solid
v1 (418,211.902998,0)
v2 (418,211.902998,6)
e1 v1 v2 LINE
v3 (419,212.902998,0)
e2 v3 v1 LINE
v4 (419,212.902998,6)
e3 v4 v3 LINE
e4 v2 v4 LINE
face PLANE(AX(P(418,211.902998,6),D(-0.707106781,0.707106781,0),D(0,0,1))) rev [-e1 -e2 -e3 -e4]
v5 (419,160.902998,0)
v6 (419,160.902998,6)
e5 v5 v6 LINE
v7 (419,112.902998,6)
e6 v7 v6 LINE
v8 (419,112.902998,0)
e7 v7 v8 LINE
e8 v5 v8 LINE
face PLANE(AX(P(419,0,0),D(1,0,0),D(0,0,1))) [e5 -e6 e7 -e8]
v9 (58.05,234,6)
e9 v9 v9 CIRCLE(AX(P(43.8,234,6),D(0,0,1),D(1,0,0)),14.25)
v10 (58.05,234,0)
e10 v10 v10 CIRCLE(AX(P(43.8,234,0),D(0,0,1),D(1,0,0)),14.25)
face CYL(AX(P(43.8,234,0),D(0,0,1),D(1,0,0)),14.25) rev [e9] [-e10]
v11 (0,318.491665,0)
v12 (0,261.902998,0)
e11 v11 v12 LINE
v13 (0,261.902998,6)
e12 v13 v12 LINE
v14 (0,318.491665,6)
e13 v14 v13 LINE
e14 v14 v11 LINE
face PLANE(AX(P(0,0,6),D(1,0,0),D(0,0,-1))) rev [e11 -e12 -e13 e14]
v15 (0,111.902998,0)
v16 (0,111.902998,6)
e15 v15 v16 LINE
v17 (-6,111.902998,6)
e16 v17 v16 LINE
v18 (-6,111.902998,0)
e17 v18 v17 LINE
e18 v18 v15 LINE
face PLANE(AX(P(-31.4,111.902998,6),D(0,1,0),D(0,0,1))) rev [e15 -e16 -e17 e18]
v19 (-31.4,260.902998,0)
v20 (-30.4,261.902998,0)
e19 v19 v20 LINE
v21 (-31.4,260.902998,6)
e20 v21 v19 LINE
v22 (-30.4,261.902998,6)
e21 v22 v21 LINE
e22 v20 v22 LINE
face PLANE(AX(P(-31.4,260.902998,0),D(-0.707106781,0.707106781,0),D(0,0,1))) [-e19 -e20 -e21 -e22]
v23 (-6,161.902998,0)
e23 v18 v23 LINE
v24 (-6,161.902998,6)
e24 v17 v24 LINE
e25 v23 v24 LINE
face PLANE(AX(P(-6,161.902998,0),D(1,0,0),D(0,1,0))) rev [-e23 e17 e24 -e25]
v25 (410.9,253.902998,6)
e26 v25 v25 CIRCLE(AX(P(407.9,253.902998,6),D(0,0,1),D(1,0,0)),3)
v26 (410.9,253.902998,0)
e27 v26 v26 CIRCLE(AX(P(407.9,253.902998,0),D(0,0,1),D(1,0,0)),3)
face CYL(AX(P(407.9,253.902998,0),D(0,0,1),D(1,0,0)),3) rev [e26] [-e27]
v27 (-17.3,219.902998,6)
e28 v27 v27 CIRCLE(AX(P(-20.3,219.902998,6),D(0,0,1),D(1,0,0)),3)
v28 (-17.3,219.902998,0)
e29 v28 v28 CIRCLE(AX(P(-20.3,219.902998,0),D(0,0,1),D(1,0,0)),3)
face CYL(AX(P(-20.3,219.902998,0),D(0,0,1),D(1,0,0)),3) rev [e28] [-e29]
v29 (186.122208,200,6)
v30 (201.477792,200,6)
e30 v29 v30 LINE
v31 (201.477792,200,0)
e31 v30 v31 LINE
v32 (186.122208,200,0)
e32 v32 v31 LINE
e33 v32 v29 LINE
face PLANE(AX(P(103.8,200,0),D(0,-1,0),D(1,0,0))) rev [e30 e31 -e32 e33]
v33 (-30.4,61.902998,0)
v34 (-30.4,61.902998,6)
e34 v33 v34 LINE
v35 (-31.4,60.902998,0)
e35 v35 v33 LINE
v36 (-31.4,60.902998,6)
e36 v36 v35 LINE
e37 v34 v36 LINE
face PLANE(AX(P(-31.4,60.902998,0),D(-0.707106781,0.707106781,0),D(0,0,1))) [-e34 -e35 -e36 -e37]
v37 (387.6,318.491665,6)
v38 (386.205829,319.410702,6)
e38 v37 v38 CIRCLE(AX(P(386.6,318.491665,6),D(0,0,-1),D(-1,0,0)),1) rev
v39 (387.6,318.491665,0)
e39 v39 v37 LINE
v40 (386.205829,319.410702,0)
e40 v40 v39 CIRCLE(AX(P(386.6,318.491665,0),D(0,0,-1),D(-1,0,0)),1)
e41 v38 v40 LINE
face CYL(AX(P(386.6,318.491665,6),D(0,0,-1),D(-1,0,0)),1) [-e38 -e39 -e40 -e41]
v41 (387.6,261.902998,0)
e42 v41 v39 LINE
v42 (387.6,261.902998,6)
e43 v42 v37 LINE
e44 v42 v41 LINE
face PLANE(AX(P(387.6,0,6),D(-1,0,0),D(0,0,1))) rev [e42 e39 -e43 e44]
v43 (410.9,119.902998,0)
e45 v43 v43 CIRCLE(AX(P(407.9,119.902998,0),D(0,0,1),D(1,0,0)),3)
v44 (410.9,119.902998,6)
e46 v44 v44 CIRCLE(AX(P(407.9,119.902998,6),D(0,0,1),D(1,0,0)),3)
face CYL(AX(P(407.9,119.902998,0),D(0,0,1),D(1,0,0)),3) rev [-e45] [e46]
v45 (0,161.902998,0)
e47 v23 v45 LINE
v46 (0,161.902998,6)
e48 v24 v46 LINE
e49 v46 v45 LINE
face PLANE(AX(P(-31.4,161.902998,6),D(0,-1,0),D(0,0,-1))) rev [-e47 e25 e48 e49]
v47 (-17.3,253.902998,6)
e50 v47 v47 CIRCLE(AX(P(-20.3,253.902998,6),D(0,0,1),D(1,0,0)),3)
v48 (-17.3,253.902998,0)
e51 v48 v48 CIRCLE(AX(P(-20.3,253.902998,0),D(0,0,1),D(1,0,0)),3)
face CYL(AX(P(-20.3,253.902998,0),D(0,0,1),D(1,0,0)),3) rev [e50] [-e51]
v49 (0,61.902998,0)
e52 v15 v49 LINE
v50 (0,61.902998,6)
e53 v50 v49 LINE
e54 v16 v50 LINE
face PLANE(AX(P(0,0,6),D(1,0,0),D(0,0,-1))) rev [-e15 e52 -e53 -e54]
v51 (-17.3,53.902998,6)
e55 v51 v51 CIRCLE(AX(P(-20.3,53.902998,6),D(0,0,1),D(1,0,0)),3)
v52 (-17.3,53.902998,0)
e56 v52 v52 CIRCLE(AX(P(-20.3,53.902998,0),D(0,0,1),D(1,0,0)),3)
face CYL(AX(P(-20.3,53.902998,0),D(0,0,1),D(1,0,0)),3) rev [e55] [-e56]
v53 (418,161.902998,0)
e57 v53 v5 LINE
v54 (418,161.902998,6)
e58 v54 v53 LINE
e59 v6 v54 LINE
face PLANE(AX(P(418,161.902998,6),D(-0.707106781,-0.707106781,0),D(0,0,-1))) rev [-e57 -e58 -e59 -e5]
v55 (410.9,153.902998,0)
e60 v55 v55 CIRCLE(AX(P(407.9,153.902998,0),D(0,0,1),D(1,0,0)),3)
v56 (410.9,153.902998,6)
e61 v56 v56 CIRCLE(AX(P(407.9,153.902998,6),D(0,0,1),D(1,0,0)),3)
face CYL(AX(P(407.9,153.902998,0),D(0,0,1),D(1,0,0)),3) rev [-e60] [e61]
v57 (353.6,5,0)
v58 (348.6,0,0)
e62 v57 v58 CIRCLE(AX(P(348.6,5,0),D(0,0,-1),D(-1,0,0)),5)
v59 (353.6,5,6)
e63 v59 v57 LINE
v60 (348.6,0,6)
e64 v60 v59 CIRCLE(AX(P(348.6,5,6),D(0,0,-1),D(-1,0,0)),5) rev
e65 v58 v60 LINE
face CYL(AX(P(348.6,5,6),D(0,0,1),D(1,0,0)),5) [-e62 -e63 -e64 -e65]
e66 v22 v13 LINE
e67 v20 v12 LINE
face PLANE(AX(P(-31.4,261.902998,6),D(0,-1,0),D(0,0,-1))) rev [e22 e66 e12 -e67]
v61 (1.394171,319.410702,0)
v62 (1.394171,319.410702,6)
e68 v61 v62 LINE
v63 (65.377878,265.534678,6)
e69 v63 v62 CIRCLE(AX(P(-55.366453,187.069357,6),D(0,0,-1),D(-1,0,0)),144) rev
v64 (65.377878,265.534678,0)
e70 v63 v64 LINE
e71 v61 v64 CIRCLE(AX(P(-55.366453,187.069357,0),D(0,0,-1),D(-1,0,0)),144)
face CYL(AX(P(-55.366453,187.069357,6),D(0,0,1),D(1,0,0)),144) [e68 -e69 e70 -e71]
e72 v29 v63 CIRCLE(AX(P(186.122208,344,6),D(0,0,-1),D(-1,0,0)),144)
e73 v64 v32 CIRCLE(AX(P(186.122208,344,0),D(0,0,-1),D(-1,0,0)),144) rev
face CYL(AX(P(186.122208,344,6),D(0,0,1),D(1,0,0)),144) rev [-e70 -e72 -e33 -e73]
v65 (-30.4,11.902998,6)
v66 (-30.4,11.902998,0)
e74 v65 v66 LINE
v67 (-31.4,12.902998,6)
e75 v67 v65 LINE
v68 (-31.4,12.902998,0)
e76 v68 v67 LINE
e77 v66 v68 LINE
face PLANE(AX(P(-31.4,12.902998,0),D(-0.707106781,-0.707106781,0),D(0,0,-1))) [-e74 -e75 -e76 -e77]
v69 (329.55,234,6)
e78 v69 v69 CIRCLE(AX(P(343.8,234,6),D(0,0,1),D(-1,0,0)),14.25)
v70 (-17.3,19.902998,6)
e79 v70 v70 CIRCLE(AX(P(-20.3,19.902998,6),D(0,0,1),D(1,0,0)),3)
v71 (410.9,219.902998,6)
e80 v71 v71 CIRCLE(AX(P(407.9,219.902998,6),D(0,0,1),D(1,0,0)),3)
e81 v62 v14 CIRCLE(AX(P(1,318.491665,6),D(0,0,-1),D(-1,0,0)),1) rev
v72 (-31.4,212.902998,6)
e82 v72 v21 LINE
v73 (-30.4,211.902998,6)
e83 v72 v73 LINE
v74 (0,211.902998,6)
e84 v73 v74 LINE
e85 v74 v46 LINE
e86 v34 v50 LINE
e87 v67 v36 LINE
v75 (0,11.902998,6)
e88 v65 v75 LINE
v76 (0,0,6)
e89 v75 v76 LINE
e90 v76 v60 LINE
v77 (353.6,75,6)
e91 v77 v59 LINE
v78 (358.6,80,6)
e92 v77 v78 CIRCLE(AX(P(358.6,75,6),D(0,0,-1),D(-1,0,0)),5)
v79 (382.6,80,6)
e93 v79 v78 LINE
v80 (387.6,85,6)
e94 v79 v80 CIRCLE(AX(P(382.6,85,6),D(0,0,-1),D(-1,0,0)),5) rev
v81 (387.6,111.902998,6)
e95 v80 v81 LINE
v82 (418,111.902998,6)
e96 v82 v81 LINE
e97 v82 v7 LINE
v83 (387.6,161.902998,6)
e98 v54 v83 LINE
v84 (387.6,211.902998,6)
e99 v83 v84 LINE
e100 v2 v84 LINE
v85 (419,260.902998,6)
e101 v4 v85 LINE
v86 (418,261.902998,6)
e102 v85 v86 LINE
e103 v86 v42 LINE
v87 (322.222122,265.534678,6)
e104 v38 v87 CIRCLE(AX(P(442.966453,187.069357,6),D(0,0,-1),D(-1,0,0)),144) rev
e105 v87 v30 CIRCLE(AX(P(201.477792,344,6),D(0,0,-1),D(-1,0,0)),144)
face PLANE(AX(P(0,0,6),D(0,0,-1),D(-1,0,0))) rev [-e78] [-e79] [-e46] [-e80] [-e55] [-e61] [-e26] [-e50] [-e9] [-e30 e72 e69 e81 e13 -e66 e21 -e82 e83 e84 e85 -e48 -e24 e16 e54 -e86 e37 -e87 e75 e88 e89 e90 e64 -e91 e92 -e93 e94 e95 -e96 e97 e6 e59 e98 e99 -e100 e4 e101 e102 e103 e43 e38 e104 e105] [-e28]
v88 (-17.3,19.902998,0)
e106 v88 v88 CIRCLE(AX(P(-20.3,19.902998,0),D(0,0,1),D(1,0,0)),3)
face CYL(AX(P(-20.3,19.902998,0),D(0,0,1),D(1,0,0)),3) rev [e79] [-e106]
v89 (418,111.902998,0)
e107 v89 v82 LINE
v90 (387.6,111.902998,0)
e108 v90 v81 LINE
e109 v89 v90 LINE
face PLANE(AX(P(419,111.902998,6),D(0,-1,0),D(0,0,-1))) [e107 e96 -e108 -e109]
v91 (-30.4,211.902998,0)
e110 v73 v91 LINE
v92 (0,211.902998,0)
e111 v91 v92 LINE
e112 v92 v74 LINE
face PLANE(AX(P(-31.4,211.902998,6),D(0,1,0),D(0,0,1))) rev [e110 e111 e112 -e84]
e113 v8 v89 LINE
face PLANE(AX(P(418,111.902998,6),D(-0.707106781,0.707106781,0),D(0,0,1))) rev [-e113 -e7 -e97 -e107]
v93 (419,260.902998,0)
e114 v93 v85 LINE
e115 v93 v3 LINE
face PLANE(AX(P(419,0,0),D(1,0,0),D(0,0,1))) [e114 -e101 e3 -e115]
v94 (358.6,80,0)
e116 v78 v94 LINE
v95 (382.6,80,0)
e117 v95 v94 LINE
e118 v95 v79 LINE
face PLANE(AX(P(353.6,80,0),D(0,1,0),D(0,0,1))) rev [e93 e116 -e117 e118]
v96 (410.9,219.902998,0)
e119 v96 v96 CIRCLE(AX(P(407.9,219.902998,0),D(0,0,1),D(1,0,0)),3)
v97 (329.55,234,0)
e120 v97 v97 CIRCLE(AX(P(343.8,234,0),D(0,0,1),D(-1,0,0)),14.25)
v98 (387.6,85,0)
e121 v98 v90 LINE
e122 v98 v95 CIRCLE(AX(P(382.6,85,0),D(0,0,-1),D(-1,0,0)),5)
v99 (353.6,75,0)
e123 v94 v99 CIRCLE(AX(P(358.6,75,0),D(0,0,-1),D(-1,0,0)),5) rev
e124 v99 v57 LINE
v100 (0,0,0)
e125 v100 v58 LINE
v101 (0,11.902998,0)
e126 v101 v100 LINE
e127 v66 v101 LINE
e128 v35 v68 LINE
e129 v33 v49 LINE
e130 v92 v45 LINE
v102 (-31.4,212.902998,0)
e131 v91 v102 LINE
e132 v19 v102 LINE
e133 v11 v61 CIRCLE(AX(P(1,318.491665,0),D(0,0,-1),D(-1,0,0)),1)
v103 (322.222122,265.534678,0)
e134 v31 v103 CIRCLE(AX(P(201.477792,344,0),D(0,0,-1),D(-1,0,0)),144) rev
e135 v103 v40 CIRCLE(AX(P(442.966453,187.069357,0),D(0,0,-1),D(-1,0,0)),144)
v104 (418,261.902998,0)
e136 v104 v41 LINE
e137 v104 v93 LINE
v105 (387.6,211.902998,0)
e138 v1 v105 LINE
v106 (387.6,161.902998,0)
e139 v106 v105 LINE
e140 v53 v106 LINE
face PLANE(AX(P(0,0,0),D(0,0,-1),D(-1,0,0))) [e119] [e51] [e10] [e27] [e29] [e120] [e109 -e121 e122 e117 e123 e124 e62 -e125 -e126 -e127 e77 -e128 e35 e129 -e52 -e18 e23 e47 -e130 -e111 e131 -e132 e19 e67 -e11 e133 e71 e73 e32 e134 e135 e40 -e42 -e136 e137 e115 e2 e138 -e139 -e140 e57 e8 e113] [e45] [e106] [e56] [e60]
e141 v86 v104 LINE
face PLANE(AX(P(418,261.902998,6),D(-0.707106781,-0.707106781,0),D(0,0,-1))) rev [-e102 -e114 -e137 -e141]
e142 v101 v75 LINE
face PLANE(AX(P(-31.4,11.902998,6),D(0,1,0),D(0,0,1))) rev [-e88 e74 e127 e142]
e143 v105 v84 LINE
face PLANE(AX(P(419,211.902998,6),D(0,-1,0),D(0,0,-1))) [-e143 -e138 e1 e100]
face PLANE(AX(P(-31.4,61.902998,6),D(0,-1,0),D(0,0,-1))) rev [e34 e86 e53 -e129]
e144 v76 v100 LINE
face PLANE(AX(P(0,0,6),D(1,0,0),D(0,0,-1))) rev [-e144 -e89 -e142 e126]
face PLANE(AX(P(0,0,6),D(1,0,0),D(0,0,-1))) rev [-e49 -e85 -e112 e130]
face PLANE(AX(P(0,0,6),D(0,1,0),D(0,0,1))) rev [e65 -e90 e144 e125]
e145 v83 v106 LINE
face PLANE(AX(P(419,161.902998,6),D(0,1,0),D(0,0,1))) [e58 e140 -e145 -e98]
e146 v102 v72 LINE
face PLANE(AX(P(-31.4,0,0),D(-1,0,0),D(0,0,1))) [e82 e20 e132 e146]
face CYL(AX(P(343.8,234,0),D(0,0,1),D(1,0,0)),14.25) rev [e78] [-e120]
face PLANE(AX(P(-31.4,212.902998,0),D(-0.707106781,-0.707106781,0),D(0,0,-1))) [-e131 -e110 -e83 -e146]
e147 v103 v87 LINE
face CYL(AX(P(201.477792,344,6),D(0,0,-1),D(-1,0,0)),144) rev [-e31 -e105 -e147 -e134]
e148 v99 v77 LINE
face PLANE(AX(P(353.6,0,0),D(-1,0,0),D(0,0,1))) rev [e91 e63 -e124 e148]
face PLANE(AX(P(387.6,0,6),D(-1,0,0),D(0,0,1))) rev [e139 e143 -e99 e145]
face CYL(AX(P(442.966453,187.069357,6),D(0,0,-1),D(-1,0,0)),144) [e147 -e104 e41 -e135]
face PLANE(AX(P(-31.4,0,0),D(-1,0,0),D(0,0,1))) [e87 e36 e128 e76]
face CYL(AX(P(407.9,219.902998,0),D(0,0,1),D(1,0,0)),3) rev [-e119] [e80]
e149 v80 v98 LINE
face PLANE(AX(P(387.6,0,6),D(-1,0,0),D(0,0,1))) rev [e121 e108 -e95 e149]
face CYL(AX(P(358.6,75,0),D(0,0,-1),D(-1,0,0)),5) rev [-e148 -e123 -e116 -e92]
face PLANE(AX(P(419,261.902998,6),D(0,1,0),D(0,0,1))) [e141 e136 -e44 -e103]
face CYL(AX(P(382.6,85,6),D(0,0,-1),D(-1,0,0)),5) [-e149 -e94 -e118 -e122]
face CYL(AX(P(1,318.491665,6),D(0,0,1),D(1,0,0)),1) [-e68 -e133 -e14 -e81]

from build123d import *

# Parameters (mm, degrees)
ESBO_O1_W                = 387.6
ESBO_O1_H                = 320
RESSALTO_EXTRUS_O1_DEPTH = 6
CORTE_EXTRUS_O1_DEPTH    = 503.662670187
ESBO_O3_R                = 14.25
CORTE_EXTRUS_O2_DEPTH    = 503.662670187
FILETE1_R                = 144
FILETE2_R                = 144
ESBO_O4_W                = 6
ESBO_O4_H                = 50
RESSALTO_EXTRUS_O2_DEPTH = 31.4
ESBO_O5_W                = 25.4
ESBO_O5_H                = 50
CORTE_EXTRUS_O3_DEPTH    = 528.25420828
ESBO_O6_W                = 40
ESBO_O6_H                = 80
CORTE_EXTRUS_O4_DEPTH    = 528.25420828
FILETE3_R                = 5
CHANFRO1_SIZE            = 1
FILETE4_R                = 1
ESBO_O8_R                = 3
CORTE_EXTRUS_O5_DEPTH    = 527.945845339


with BuildPart() as part:
    # Esboço1 → Ressalto-extrusão1 (new body)
    with BuildSketch(Plane.XY):
        with Locations((193.8, 160)):
            Rectangle(ESBO_O1_W, ESBO_O1_H)
    extrude(amount=RESSALTO_EXTRUS_O1_DEPTH)

    # Esboço2 → Corte-extrusão1 (cut, through all)
    with BuildSketch(Plane.XY.offset(6)):
        Polygon((33.8, 320), (103.8, 200), (283.8, 200), (353.8, 320), align=None)
    extrude(amount=-CORTE_EXTRUS_O1_DEPTH, mode=Mode.SUBTRACT)

    # Esboço3 → Corte-extrusão2 (cut, through all)
    with BuildSketch(Plane.XY.offset(6)):
        with Locations((43.8, 234)):
            Circle(ESBO_O3_R)
        with Locations(Location((343.8, 234, 0), (0, 0, 180))):
            Circle(ESBO_O3_R)
    extrude(amount=-CORTE_EXTRUS_O2_DEPTH, mode=Mode.SUBTRACT)

    # Filete1
    # the kernel refuses this fillet: 144 mm, written as the material it takes off along each edge
    with BuildSketch(Plane(origin=(353.8, 320, 180.735732562), x_dir=(1, 0, 0), z_dir=(0, 0, -1))) as filete1_piece_1:
        with BuildLine():
            CenterArc((89.166452625, 132.930643283), FILETE1_R, 210.256437164, 37.131526626)
            Line((-35.217709105, 60.373215608), (-37.705392339, 58.922067054))
            Line((-37.705392339, 58.922067054), (-2.487683235, -1.451148554))
            Line((-2.487683235, -1.451148554), (0, -2.88))
            ThreePointArc((0, -2.88), (16.9, -2.88), (32.692670948, -2.658612866))
            Line((32.692670948, -2.658612866), (33.8, 0))
        make_face()
    extrude(amount=355.471465124, mode=Mode.SUBTRACT)
    with BuildSketch(Plane(origin=(33.8, 320, 180.735732562), x_dir=(-1, 0, 0), z_dir=(0, 0, -1))) as filete1_piece_2:
        with BuildLine():
            CenterArc((89.166452625, -132.930643283), FILETE1_R, 112.612036211, 37.131526626)
            Line((-35.217709105, -60.373215608), (-37.705392339, -58.922067054))
            Line((-37.705392339, -58.922067054), (-2.487683235, 1.451148554))
            Line((-2.487683235, 1.451148554), (0, 2.88))
            ThreePointArc((0, 2.88), (16.9, 2.88), (32.692670948, 2.658612866))
            Line((32.692670948, 2.658612866), (33.8, 0))
        make_face()
    extrude(amount=355.471465124, mode=Mode.SUBTRACT)

    # Filete2
    filete2_edges = [part.edges().sort_by_distance(p)[0] for p in [
        (283.8, 200, 3),
        (103.8, 200, 3),
    ]]
    fillet(filete2_edges, radius=FILETE2_R)

    # Esboço4 → Ressalto-extrusão2 (add)
    with BuildSketch(Plane.ZY):
        with Locations((3, 236.902997942)):
            Rectangle(ESBO_O4_W, ESBO_O4_H)
        with Locations((3, 136.902997942)):
            Rectangle(ESBO_O4_W, ESBO_O4_H)
        with Locations((3, 36.902997942)):
            Rectangle(ESBO_O4_W, ESBO_O4_H)
    ressalto_extrus_o2 = extrude(amount=RESSALTO_EXTRUS_O2_DEPTH)

    # Espelhar1: Ressalto-extrusão2 across plane
    add(ressalto_extrus_o2.mirror(Plane.ZY.offset(-193.8)))

    # Esboço5 → Corte-extrusão3 (cut, through all)
    with BuildSketch(Plane.XY.offset(6)):
        with Locations((406.3, 36.902997942)):
            Rectangle(ESBO_O5_W, ESBO_O5_H)
        with Locations((-18.7, 136.902997942)):
            Rectangle(ESBO_O5_W, ESBO_O5_H)
    extrude(amount=-CORTE_EXTRUS_O3_DEPTH, mode=Mode.SUBTRACT)

    # Esboço6 → Corte-extrusão4 (cut, through all)
    with BuildSketch(Plane.XY.offset(6)):
        with Locations((373.6, 40)):
            Rectangle(ESBO_O6_W, ESBO_O6_H)
    extrude(amount=-CORTE_EXTRUS_O4_DEPTH, mode=Mode.SUBTRACT)

    # Filete3
    filete3_edges = [part.edges().sort_by_distance(p)[0] for p in [
        (387.6, 80, 3),
        (353.6, 80, 3),
        (353.6, 0, 3),
    ]]
    fillet(filete3_edges, radius=FILETE3_R)

    # Chanfro1
    chanfro1_edges = [part.edges().sort_by_distance(p)[0] for p in [
        (-31.4, 61.902997942, 3),
        (-31.4, 11.902997942, 3),
        (419, 261.902997942, 3),
        (419, 211.902997942, 3),
        (419, 161.902997942, 3),
        (419, 111.902997942, 3),
        (-31.4, 261.902997942, 3),
        (-31.4, 211.902997942, 3),
    ]]
    chamfer(chanfro1_edges, length=CHANFRO1_SIZE)

    # Filete4
    filete4_edges = [part.edges().sort_by_distance(p)[0] for p in [
        (0, 320, 3),
        (387.6, 320, 3),
    ]]
    fillet(filete4_edges, radius=FILETE4_R)

    # Esboço8 → Corte-extrusão5 (cut, through all)
    with BuildSketch(Plane.XY.offset(6)):
        with Locations((407.9, 253.902997942)):
            Circle(ESBO_O8_R)
        with Locations((407.9, 219.902997942)):
            Circle(ESBO_O8_R)
        with Locations((407.9, 153.902997942)):
            Circle(ESBO_O8_R)
        with Locations((407.9, 119.902997942)):
            Circle(ESBO_O8_R)
        with Locations((-20.3, 19.902997942)):
            Circle(ESBO_O8_R)
        with Locations((-20.3, 53.902997942)):
            Circle(ESBO_O8_R)
        with Locations((-20.3, 219.902997942)):
            Circle(ESBO_O8_R)
        with Locations((-20.3, 253.902997942)):
            Circle(ESBO_O8_R)
    extrude(amount=-CORTE_EXTRUS_O5_DEPTH, mode=Mode.SUBTRACT)


solid = part.part
